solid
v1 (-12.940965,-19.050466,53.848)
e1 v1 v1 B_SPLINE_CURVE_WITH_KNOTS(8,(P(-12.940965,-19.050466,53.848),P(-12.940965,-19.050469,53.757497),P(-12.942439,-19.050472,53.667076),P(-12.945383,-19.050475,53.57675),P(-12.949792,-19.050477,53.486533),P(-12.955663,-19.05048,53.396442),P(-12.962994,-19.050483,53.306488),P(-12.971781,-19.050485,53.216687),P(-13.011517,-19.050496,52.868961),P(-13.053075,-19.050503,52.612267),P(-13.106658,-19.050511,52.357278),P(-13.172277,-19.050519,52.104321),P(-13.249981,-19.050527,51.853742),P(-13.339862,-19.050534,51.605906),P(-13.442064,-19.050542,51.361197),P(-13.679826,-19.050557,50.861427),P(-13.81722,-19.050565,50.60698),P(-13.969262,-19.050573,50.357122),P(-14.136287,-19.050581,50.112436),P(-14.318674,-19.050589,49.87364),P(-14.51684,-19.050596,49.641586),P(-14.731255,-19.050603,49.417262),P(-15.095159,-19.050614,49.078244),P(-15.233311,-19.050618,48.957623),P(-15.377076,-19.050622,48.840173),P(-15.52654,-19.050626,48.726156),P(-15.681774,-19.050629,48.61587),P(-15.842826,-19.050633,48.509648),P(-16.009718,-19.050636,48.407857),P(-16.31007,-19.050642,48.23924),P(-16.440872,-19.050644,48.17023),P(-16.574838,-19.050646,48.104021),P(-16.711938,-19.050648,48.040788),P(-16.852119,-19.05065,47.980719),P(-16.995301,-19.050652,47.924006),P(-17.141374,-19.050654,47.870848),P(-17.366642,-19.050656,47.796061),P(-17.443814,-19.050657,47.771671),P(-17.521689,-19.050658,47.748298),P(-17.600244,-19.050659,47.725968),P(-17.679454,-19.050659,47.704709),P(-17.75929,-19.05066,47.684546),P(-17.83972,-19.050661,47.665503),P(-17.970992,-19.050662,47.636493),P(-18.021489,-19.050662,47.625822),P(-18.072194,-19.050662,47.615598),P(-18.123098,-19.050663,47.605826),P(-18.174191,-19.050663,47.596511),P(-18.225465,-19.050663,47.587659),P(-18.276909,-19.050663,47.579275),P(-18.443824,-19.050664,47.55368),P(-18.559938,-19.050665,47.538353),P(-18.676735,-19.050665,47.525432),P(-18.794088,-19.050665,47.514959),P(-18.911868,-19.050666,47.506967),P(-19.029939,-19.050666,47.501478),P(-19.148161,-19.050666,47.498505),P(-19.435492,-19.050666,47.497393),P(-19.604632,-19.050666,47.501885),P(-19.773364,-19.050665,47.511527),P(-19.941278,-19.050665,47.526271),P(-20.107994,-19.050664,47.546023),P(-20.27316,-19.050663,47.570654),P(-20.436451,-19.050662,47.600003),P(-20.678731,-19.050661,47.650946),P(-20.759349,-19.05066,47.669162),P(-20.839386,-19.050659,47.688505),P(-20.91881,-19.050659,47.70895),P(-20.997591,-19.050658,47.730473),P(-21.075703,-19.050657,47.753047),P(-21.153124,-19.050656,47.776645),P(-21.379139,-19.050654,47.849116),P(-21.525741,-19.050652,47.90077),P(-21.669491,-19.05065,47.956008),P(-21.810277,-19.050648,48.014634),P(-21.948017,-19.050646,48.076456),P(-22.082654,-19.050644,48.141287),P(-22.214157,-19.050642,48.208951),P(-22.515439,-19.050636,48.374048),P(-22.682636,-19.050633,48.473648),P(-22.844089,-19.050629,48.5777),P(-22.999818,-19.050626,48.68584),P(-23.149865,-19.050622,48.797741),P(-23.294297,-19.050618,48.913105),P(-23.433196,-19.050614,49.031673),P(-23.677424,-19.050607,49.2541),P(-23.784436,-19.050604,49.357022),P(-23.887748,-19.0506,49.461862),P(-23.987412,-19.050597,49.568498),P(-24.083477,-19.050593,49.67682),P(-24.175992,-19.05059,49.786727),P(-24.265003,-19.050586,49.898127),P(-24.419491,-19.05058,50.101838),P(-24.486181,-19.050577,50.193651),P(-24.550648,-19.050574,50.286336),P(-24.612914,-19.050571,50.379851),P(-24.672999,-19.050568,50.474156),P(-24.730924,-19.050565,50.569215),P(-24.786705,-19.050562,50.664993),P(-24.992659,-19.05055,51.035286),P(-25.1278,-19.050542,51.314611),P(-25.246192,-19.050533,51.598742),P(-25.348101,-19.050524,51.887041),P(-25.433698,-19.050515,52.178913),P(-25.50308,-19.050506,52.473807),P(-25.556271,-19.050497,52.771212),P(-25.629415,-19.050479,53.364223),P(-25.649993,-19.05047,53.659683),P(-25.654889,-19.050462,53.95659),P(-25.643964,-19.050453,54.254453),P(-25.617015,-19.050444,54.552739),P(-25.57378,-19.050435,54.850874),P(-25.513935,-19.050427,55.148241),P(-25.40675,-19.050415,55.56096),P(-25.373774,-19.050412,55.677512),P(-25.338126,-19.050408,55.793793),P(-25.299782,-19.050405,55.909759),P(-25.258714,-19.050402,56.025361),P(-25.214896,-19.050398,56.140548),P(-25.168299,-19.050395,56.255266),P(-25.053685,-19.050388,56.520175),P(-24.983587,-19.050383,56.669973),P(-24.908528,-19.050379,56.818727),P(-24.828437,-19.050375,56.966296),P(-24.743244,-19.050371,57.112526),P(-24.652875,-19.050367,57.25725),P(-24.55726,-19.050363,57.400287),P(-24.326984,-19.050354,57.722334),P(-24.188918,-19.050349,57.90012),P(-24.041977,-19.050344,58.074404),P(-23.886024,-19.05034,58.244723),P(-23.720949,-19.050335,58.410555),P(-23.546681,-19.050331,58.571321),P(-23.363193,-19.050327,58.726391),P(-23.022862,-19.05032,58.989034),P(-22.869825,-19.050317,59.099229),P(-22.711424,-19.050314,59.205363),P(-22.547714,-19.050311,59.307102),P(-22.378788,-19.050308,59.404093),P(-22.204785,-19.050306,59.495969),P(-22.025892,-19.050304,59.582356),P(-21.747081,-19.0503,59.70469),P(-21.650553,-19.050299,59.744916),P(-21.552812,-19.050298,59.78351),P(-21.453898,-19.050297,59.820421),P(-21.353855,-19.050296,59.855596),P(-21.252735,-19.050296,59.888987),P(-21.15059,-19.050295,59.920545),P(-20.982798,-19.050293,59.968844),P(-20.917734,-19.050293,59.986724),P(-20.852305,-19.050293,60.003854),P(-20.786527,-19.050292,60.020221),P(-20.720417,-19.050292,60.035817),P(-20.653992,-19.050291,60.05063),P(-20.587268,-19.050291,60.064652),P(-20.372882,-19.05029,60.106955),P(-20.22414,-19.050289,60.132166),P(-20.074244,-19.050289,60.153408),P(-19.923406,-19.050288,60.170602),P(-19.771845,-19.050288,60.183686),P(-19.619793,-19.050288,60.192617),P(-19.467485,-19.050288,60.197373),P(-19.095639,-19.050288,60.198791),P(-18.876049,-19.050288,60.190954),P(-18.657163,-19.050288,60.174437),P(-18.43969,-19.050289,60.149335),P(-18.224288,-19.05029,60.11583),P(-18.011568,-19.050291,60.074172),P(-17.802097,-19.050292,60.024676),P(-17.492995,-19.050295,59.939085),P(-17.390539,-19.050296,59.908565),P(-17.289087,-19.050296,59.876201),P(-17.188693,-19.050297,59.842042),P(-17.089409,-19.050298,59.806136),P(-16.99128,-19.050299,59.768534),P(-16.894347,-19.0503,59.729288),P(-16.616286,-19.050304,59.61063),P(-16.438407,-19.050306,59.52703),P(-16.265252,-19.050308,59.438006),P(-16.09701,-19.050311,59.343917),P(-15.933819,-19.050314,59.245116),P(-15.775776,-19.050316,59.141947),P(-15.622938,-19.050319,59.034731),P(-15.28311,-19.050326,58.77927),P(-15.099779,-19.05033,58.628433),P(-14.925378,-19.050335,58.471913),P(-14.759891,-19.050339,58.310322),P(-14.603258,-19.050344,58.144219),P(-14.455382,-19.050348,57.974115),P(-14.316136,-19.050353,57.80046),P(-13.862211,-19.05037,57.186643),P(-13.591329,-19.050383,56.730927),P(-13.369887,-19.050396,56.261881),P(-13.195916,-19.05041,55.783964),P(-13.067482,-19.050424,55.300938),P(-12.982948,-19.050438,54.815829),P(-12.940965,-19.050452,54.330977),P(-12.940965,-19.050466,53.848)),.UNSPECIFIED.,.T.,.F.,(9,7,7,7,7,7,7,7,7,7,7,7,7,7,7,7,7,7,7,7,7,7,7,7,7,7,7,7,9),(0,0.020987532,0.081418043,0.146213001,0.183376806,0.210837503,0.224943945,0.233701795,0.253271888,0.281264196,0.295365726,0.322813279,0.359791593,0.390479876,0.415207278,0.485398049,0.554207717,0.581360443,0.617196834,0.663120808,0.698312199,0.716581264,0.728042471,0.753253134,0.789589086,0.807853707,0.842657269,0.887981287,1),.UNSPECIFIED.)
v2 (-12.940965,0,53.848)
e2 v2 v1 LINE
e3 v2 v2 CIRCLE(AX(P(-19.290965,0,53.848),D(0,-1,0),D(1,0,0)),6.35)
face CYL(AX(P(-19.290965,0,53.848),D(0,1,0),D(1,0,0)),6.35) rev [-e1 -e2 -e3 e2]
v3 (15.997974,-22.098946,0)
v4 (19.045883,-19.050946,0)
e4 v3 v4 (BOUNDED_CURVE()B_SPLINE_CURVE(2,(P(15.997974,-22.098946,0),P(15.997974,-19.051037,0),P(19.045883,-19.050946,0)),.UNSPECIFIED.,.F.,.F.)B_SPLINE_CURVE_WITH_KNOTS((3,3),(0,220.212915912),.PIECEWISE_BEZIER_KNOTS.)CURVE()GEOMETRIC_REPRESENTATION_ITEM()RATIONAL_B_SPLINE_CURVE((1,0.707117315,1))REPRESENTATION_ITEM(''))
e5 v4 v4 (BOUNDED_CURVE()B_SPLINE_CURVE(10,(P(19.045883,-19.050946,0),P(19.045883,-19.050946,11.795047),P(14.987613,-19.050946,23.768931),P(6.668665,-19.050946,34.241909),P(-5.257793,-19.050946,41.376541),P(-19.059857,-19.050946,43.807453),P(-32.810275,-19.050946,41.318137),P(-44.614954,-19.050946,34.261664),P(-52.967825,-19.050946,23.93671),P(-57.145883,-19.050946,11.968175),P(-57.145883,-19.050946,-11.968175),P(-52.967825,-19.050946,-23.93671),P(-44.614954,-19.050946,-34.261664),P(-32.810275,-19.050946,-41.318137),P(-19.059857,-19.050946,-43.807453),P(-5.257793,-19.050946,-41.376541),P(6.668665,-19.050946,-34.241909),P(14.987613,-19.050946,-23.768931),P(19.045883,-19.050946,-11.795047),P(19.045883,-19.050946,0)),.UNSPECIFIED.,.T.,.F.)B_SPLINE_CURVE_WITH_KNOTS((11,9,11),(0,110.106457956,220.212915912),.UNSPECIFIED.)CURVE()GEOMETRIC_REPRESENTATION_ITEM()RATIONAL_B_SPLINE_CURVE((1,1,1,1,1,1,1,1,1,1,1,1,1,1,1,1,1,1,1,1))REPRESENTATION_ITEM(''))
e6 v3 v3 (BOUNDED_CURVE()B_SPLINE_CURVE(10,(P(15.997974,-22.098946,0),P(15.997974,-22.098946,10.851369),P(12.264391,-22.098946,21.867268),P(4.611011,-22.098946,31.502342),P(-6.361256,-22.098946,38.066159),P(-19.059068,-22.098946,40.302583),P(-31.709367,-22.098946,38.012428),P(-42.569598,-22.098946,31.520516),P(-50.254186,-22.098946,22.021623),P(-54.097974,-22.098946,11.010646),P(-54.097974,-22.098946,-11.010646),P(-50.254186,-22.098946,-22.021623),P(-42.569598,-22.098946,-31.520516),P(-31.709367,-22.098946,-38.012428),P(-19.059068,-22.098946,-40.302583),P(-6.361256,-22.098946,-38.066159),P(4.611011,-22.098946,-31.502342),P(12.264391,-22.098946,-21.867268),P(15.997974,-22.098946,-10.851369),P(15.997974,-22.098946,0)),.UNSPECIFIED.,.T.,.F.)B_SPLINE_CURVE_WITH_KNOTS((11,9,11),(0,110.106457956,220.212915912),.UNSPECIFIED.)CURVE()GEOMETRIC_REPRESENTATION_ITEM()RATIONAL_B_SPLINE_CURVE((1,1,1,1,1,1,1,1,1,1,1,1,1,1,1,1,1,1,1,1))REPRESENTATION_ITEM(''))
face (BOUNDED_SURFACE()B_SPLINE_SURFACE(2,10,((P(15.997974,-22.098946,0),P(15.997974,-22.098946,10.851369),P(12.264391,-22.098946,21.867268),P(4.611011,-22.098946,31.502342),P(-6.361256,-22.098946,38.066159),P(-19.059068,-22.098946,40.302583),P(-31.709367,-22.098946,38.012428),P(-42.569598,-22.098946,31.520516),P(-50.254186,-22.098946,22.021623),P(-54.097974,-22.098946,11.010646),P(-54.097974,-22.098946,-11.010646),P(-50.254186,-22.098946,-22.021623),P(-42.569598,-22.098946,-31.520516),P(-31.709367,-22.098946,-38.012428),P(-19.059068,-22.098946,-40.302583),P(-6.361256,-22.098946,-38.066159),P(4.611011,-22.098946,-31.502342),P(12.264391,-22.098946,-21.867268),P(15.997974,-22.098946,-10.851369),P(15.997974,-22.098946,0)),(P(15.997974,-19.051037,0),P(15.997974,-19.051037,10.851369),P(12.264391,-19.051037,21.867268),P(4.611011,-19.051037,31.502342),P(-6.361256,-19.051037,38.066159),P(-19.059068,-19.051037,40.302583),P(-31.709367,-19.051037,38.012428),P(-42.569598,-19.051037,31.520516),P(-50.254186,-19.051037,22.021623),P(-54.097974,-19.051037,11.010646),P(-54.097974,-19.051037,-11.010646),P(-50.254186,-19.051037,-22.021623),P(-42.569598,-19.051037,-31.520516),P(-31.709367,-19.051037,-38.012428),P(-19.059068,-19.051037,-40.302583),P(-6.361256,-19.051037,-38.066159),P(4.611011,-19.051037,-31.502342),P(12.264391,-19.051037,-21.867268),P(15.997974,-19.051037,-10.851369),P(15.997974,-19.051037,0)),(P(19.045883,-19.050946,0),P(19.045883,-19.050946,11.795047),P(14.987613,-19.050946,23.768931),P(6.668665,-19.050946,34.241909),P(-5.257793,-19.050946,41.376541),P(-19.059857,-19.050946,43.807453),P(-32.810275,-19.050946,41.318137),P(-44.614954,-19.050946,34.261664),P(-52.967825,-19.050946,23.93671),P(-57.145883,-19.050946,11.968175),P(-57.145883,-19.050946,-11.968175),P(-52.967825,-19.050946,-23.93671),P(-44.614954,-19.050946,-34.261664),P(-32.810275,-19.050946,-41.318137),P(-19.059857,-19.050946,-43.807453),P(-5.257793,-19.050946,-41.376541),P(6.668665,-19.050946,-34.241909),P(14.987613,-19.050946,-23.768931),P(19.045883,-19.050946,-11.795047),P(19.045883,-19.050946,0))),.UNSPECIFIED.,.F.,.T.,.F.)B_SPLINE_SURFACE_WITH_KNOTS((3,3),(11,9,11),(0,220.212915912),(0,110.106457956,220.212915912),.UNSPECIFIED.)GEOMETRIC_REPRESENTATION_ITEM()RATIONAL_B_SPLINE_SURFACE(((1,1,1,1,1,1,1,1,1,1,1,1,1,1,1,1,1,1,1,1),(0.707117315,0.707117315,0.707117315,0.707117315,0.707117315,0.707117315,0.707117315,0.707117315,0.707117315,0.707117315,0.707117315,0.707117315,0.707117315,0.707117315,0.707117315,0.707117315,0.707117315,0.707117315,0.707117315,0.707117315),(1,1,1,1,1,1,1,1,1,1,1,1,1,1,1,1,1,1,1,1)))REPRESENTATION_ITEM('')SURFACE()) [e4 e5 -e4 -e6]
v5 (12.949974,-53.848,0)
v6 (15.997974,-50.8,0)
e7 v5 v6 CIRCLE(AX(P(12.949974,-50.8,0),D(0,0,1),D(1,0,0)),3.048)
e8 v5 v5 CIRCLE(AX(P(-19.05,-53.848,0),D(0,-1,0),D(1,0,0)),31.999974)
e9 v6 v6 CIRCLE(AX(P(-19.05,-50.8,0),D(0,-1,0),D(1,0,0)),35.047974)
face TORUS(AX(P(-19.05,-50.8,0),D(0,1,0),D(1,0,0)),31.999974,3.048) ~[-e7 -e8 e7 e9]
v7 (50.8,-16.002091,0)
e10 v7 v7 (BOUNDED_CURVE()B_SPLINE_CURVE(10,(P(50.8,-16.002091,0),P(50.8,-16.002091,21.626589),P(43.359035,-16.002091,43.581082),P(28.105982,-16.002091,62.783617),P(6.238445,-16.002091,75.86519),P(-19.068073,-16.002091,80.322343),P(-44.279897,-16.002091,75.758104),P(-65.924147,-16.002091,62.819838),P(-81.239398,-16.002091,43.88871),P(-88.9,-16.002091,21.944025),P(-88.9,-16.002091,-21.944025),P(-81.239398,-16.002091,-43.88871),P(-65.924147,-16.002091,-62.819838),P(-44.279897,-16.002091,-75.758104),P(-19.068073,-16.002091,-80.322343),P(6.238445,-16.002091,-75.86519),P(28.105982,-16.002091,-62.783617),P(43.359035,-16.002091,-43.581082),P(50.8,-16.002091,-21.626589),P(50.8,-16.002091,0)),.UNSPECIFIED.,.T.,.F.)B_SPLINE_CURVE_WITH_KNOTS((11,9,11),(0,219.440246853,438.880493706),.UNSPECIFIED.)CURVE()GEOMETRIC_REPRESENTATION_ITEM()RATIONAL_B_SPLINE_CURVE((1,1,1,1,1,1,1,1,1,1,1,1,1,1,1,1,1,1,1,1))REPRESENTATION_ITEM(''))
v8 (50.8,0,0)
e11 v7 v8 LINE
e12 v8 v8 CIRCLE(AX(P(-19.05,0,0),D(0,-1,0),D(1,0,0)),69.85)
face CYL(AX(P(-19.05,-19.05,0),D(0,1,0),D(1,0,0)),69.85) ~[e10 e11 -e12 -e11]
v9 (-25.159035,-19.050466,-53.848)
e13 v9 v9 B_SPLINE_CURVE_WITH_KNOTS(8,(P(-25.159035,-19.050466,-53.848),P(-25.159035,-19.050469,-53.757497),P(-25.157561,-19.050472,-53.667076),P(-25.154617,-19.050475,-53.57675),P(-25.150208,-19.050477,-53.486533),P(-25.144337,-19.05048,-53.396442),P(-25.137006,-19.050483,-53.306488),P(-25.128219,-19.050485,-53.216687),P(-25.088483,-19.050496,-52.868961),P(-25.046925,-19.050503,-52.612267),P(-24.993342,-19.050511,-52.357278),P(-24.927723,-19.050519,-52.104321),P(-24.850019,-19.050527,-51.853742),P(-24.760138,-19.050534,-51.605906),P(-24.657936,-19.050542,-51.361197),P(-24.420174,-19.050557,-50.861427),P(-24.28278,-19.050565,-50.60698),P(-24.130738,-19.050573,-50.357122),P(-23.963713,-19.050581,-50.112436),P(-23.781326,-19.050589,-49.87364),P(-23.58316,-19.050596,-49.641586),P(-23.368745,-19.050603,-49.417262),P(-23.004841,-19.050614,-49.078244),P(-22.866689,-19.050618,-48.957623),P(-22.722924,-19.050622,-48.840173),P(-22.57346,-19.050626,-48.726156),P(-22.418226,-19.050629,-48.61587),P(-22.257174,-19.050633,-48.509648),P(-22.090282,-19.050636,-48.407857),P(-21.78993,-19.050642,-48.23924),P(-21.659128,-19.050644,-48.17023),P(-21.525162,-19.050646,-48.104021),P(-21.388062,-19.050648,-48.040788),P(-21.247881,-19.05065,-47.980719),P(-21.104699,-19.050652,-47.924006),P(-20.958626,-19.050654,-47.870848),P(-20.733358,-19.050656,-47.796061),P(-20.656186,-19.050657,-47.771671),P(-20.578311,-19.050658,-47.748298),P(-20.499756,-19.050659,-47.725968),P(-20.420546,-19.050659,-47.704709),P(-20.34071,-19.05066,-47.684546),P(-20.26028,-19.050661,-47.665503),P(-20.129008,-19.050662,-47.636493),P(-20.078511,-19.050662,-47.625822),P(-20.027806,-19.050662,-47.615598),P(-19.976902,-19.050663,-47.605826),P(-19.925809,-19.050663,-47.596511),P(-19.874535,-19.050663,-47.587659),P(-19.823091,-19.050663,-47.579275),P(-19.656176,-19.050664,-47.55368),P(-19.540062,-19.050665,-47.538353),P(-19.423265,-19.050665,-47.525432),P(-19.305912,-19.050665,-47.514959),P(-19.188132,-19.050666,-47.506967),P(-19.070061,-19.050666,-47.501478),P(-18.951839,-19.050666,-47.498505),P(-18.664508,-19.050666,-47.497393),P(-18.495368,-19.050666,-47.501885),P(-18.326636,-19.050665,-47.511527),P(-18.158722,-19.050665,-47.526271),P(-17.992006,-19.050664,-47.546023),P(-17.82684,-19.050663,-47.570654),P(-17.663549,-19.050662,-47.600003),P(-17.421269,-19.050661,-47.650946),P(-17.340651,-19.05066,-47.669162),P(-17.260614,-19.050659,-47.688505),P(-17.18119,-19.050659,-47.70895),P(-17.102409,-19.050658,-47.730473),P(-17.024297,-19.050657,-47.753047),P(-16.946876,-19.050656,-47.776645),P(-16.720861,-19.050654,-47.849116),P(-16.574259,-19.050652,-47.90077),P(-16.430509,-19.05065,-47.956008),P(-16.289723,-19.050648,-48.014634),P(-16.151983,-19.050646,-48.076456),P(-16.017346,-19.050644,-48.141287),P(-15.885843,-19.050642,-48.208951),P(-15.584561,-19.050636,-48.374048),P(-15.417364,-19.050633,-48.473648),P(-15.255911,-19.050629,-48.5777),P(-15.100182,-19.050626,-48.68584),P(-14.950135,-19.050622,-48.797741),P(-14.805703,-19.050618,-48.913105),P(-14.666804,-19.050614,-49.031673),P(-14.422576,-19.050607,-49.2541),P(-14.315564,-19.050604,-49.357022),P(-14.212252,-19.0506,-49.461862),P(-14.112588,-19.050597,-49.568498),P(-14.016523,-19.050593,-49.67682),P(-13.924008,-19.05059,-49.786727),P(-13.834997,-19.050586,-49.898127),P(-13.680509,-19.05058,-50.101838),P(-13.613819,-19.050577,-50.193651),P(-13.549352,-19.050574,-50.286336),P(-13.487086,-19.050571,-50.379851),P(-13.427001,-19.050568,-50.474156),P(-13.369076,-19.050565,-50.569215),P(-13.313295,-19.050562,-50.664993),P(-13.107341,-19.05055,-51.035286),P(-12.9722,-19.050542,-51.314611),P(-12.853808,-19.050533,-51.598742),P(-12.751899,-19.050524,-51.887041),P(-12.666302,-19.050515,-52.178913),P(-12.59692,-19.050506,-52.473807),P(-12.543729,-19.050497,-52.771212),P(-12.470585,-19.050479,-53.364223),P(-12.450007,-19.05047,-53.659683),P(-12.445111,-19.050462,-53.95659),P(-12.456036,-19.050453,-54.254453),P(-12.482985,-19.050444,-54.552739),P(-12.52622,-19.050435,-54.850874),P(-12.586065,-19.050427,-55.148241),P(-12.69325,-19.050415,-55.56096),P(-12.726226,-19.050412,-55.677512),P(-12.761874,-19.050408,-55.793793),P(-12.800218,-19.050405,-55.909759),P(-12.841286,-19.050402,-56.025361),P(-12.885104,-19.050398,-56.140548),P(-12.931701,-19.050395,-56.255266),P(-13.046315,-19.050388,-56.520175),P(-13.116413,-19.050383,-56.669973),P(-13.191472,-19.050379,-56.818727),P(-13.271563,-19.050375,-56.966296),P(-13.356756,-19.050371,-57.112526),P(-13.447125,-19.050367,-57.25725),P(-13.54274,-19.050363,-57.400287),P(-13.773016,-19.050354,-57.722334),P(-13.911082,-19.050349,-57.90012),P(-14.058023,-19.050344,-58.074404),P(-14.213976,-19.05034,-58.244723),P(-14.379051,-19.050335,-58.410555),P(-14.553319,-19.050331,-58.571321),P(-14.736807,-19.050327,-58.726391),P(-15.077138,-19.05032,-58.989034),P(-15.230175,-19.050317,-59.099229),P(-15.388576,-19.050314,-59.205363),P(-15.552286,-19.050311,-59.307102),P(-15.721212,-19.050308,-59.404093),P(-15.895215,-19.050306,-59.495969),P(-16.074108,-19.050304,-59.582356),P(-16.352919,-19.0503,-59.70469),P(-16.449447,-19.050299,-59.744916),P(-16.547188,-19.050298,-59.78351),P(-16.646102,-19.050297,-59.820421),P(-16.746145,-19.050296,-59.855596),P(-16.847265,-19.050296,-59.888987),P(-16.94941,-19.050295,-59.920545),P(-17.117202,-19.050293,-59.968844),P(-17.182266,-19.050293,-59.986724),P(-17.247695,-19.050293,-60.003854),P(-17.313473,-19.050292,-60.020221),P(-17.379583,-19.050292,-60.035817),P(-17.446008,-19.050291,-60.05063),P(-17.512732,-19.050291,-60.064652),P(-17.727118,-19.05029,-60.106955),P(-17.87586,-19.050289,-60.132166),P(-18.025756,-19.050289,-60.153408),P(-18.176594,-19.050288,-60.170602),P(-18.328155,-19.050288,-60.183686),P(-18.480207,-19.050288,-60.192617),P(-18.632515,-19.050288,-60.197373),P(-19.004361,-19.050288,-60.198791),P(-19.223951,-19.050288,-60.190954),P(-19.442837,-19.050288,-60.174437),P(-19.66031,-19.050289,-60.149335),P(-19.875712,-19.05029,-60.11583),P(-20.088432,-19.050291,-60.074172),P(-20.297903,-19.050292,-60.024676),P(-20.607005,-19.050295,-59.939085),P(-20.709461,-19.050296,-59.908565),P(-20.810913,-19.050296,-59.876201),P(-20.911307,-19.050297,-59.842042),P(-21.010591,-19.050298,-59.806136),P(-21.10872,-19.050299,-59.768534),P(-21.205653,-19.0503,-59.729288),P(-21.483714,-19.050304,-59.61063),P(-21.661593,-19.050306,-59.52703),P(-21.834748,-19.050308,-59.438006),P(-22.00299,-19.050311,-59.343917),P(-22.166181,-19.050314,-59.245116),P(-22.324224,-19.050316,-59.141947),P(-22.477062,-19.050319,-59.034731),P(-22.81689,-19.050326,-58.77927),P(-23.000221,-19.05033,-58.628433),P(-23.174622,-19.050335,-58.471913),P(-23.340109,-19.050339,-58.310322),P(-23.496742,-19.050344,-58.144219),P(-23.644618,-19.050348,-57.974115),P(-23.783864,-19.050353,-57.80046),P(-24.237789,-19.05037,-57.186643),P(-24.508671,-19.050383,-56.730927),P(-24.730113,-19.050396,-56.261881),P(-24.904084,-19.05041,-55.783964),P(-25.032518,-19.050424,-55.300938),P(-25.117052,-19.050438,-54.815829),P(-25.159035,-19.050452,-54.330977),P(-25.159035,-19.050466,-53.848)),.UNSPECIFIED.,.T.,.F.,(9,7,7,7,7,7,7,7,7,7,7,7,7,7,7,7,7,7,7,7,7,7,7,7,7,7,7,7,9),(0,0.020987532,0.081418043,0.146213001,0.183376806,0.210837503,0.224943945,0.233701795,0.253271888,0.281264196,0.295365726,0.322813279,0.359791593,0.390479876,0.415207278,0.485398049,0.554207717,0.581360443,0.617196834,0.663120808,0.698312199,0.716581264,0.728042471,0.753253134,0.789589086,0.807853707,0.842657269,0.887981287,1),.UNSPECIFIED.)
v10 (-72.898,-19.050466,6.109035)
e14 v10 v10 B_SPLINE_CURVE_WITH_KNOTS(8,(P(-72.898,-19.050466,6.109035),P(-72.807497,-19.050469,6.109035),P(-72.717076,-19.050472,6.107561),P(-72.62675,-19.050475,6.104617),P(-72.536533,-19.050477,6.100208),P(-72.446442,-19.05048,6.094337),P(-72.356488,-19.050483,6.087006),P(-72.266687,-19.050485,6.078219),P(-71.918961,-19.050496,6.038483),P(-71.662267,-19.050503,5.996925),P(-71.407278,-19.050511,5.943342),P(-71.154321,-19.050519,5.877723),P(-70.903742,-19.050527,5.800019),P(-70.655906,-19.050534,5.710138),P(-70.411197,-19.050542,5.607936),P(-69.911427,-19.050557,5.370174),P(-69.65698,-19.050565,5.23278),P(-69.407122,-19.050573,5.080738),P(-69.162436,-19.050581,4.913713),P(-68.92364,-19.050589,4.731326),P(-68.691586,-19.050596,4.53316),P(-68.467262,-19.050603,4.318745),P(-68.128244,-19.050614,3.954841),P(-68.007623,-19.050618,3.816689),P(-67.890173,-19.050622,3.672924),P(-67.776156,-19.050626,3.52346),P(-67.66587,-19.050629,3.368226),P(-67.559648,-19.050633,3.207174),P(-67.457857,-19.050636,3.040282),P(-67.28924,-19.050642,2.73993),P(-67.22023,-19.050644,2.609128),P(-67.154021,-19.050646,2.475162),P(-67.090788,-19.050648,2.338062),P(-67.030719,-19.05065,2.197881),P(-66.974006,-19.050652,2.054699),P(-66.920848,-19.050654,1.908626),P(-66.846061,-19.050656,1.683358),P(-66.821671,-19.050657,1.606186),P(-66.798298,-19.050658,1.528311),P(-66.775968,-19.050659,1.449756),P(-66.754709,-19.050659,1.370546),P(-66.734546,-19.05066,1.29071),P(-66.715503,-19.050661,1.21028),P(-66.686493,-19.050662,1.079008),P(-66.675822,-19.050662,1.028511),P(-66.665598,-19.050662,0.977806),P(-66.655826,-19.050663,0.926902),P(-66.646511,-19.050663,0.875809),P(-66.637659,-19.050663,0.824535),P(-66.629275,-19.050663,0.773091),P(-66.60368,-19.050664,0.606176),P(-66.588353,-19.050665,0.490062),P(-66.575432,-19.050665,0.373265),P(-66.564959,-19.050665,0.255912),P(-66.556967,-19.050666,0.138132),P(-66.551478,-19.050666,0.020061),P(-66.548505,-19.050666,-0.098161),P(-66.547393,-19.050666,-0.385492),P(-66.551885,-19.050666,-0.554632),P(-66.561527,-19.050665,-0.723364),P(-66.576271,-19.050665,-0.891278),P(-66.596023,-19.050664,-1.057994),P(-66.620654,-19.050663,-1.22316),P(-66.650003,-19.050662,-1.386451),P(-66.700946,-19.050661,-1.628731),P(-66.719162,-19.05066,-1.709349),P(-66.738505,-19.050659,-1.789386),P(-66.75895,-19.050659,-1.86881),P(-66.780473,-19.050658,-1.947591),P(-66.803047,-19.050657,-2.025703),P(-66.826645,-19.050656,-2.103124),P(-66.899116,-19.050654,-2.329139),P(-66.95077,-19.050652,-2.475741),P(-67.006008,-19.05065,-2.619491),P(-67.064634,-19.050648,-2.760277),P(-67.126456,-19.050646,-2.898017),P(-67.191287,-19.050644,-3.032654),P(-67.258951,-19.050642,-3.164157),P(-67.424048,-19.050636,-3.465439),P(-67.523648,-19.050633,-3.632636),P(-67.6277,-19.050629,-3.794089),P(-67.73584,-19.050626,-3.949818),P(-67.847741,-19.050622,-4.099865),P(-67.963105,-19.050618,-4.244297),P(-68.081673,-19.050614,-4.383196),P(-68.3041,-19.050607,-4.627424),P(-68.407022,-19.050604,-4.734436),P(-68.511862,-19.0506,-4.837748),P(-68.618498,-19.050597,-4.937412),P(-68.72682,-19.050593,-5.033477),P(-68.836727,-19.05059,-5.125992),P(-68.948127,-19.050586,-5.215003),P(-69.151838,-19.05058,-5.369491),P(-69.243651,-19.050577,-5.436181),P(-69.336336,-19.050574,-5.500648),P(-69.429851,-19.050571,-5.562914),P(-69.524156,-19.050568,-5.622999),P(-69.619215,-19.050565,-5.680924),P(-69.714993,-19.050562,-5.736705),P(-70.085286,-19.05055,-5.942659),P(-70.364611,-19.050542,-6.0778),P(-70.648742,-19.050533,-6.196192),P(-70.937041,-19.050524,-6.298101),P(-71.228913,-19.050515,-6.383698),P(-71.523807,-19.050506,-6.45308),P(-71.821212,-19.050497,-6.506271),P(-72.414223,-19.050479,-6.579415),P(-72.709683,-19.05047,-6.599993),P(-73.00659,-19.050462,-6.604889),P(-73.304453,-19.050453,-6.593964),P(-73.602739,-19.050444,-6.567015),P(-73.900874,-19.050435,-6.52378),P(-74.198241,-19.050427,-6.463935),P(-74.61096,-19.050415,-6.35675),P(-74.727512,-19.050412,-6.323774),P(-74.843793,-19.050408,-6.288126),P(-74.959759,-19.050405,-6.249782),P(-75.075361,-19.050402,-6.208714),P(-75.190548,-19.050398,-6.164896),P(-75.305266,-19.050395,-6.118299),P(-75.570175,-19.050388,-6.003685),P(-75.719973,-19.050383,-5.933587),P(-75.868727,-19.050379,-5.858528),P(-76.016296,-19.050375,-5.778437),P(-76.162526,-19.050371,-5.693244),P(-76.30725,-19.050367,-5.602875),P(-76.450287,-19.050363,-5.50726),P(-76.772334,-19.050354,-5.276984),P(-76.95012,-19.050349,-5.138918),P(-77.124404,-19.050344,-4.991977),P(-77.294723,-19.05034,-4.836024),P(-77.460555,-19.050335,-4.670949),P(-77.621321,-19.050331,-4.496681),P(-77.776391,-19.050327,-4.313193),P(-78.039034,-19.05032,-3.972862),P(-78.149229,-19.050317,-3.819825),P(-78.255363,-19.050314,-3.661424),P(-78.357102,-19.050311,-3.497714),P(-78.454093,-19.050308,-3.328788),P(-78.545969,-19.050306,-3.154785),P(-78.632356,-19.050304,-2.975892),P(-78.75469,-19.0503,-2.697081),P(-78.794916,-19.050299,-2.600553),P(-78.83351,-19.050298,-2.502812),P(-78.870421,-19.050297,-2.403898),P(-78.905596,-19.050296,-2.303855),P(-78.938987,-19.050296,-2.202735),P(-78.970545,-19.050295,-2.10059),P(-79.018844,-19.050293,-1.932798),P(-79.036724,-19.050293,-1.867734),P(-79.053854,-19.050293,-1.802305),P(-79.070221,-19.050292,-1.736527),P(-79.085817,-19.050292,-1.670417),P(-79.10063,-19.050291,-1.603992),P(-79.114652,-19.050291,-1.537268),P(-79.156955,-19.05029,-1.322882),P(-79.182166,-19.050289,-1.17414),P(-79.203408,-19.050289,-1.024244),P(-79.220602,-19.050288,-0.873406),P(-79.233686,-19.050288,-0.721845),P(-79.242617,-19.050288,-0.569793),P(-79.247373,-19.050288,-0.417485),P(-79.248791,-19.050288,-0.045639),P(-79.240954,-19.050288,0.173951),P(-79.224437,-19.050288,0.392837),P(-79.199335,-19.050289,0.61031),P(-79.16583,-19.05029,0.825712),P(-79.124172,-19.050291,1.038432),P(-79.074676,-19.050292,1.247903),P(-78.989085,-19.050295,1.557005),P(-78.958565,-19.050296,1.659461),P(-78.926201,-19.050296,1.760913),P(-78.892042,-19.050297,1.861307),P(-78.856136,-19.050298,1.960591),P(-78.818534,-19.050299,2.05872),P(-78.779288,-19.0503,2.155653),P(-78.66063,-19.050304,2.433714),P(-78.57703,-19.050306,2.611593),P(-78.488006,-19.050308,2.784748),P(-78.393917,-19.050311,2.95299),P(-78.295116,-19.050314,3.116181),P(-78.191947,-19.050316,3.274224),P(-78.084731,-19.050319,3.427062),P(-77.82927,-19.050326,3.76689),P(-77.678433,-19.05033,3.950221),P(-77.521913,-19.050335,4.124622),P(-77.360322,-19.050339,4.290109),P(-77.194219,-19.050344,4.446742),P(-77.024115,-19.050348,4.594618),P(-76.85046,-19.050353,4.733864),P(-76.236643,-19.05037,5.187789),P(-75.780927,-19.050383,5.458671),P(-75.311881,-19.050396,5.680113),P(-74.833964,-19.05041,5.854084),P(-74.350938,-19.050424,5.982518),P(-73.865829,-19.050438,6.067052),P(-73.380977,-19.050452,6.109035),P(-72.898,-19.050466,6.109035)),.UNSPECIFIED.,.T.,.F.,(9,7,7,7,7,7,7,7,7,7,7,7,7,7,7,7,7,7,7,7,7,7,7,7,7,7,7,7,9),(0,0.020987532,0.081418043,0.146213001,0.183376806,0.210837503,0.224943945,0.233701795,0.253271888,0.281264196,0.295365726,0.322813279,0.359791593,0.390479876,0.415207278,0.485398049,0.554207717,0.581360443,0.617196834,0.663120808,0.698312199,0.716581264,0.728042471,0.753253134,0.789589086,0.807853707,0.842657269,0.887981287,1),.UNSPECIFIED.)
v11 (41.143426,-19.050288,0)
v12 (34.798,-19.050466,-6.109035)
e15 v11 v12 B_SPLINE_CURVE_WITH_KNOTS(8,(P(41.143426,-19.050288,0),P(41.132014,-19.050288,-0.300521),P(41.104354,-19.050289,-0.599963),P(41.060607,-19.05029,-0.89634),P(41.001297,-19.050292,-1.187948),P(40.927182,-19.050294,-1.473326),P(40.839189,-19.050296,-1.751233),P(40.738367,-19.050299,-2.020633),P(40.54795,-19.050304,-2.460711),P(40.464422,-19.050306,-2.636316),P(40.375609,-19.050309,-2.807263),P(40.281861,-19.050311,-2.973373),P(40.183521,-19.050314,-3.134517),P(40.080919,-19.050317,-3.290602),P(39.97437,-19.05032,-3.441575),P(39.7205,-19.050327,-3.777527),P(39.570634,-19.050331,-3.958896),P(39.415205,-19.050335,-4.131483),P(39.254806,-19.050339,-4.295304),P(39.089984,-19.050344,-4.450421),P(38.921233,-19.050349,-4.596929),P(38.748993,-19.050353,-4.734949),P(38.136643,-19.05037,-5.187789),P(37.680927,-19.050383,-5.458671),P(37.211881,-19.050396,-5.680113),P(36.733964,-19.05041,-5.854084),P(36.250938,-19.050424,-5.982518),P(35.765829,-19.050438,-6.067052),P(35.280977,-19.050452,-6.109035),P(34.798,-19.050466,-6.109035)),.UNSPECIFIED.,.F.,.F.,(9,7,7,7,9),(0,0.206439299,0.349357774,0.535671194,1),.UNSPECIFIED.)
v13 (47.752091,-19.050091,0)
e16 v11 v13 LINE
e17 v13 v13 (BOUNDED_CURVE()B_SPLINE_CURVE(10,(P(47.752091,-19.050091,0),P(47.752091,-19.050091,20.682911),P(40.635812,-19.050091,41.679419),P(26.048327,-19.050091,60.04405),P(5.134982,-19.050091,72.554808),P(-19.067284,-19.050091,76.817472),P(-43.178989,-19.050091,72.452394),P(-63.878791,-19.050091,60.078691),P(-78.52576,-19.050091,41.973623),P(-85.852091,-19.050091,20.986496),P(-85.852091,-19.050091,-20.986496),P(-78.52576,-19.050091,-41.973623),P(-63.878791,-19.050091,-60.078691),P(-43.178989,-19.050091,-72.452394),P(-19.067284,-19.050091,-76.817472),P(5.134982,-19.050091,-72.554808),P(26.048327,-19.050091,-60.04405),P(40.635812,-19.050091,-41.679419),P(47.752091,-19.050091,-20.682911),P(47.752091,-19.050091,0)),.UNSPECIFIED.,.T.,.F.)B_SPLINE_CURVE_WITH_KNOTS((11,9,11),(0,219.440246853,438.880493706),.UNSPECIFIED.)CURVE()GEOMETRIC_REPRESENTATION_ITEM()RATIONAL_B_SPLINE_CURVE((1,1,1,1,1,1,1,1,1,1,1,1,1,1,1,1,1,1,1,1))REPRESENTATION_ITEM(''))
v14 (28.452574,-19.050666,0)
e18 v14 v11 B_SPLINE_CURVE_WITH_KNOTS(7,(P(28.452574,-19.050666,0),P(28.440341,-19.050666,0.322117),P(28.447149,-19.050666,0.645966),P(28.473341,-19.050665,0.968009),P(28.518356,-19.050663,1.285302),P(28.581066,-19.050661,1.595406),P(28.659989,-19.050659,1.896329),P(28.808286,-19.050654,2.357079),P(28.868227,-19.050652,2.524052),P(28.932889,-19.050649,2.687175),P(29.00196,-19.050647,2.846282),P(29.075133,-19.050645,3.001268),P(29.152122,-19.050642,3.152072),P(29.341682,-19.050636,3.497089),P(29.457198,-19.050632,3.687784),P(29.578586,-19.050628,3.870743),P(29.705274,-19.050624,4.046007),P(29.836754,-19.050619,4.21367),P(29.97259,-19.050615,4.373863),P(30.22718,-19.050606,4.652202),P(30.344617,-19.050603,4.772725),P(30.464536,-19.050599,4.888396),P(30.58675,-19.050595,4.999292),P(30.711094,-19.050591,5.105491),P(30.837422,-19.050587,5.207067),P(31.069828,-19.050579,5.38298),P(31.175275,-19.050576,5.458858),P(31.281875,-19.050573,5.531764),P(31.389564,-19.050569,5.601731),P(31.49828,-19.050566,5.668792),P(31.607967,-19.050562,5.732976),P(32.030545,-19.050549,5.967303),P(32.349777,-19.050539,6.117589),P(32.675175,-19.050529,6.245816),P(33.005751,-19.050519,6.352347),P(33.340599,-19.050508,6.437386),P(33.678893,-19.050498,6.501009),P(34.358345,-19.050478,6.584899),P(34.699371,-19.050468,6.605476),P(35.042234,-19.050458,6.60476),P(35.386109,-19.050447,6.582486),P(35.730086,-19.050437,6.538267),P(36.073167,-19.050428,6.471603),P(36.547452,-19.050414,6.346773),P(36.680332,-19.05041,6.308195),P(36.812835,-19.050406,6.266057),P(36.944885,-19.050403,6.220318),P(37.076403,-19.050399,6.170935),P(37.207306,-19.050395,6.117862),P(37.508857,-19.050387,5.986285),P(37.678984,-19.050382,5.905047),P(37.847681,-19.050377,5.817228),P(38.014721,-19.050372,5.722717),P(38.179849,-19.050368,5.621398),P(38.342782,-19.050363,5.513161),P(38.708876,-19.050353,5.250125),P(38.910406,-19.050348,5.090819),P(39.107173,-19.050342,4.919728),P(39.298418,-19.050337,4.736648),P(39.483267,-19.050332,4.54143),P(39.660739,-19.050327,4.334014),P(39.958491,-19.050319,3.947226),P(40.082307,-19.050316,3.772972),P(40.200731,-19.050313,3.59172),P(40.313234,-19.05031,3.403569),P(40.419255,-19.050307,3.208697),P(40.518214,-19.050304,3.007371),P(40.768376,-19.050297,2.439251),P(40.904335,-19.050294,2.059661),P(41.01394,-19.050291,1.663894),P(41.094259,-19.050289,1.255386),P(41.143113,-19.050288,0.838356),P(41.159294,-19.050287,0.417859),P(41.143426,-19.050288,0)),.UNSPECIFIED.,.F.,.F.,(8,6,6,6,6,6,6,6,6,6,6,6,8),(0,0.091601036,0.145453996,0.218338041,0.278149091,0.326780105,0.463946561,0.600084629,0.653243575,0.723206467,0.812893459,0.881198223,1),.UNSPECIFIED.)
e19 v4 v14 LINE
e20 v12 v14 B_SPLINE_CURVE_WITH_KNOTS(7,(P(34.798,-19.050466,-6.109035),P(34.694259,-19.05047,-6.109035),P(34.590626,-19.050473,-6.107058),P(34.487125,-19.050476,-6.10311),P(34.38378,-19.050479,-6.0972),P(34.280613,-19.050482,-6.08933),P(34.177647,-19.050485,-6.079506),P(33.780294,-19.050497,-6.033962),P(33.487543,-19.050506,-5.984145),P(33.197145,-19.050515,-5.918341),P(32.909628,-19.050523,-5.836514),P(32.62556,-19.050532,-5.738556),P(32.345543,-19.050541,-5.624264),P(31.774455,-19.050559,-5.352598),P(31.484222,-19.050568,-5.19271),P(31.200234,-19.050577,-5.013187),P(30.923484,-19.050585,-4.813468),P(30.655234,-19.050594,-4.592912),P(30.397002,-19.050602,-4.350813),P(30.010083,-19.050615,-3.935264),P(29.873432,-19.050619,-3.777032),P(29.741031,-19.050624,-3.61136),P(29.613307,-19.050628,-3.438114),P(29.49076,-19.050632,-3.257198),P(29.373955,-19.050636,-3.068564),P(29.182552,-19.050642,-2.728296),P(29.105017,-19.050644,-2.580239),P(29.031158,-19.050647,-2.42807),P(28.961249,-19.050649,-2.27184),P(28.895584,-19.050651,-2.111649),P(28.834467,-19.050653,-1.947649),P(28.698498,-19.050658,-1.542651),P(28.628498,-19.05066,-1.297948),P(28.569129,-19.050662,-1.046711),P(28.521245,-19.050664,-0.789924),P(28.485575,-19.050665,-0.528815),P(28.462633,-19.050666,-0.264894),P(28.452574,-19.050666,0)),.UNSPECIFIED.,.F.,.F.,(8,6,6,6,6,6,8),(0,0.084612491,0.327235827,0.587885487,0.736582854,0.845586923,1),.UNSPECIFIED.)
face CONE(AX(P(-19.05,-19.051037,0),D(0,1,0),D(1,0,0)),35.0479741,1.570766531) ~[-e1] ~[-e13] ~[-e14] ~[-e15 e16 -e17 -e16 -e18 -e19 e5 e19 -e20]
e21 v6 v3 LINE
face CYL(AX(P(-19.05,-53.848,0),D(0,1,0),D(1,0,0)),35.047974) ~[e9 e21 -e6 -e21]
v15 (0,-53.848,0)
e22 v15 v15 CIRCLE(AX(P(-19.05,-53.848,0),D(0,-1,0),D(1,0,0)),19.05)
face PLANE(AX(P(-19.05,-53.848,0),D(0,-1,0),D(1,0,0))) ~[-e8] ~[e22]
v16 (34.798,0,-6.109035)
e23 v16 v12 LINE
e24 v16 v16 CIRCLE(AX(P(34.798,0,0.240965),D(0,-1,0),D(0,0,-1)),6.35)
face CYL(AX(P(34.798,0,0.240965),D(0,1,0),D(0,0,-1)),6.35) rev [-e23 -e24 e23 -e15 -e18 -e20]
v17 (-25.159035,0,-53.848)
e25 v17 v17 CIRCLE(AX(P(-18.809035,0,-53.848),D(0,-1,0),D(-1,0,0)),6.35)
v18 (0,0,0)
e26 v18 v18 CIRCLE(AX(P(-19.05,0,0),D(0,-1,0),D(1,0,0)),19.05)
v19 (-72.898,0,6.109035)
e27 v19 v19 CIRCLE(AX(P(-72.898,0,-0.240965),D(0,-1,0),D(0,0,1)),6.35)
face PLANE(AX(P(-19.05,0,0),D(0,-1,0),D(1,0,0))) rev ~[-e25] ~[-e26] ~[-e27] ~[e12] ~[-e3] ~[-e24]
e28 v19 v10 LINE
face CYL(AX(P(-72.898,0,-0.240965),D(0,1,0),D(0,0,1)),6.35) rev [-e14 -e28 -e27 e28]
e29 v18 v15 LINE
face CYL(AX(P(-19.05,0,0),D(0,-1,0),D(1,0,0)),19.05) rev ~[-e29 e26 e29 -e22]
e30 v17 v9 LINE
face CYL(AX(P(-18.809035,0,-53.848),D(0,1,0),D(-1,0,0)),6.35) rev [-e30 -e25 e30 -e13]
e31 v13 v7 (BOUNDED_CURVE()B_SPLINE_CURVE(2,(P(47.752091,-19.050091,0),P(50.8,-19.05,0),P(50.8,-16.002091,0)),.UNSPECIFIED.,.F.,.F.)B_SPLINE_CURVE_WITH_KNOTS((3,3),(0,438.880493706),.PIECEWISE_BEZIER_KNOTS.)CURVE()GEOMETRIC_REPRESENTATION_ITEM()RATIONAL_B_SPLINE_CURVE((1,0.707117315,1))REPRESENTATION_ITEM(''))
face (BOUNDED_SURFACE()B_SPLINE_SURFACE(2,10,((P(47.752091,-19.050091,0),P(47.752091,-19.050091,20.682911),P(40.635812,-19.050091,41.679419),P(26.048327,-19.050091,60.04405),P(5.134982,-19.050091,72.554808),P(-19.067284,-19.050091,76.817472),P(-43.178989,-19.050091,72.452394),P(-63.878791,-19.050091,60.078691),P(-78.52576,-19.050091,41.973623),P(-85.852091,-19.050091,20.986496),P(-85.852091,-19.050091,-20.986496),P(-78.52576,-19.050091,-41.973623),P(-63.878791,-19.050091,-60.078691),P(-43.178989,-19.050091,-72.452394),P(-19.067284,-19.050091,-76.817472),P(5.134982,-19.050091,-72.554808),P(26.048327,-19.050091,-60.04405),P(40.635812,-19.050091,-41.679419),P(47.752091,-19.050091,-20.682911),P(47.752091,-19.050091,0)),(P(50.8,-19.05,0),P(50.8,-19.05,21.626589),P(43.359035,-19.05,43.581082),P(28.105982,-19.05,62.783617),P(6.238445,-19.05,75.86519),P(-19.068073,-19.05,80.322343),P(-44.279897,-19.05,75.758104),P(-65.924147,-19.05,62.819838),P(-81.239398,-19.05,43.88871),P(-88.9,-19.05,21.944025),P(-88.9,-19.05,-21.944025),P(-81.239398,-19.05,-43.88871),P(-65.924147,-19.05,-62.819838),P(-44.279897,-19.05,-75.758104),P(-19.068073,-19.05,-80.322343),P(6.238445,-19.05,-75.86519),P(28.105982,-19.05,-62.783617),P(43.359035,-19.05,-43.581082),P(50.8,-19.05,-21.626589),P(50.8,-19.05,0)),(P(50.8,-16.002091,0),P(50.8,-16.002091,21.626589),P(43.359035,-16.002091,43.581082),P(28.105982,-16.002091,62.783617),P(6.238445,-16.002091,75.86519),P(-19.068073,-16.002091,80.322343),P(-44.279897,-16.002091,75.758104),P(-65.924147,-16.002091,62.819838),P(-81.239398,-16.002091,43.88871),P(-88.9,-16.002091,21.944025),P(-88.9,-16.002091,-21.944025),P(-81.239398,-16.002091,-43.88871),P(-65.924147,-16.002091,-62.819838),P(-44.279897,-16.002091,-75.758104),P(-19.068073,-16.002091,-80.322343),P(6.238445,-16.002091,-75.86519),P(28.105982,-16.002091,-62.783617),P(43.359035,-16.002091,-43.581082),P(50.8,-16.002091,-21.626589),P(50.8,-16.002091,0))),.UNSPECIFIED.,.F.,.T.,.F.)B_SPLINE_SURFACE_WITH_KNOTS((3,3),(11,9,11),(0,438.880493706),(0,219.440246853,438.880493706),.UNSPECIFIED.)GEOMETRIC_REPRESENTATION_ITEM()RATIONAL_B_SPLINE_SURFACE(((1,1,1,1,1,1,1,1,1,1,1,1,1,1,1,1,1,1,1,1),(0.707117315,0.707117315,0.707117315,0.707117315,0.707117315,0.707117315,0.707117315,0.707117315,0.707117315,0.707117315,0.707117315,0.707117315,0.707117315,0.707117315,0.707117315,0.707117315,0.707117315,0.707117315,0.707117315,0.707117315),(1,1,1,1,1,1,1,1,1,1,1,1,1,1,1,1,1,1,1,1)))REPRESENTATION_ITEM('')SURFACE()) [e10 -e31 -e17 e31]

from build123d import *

# Parameters (mm, degrees)
F2_R            = 3.048
F3_R            = 6.35
F4_DEPTH        = 53.849
F4_COPIES_COUNT = 4


# Not quite as in the source:
# - a pattern or mirror of a feature is missing from the dataset's text; its kind, count and spacing are read off the source's solid


with BuildPart() as f1:
    # F0 (on Top) → F1 (revolve)
    with BuildSketch(Plane.XY):
        Polygon((50.8, 0), (0, 0), (0, -53.848), (15.9979741, -53.848), (15.9979741, -19.0510369452), (50.8, -19.05), align=None)
    revolve(axis=Axis((-19.05, -27.312900871, 0), (0, -1, 0)))

    # F2
    f2_edges = [f1.edges().sort_by_distance(p)[0] for p in [
        (-88.9, -19.05, 0),
        (-54.097974, -19.051037, 0),
        (-54.097974, -53.848, 0),
    ]]
    fillet(f2_edges, radius=F2_R)

    # F3 (on Front) → F4 (cut, through all)
    with BuildSketch(Plane.XZ):
        with Locations((-19.2909650505, 53.848)):
            Circle(F3_R)
    f4 = extrude(amount=F4_DEPTH, mode=Mode.SUBTRACT)

    # F4_copies: F4 ×4 about axis
    f4_copies_axis = Axis((-19.05, 0, 0), (0, 1, 0))
    for i in range(1, F4_COPIES_COUNT):
        add(f4.rotate(f4_copies_axis, i * 360 / F4_COPIES_COUNT), mode=Mode.SUBTRACT)


solid = f1.part
